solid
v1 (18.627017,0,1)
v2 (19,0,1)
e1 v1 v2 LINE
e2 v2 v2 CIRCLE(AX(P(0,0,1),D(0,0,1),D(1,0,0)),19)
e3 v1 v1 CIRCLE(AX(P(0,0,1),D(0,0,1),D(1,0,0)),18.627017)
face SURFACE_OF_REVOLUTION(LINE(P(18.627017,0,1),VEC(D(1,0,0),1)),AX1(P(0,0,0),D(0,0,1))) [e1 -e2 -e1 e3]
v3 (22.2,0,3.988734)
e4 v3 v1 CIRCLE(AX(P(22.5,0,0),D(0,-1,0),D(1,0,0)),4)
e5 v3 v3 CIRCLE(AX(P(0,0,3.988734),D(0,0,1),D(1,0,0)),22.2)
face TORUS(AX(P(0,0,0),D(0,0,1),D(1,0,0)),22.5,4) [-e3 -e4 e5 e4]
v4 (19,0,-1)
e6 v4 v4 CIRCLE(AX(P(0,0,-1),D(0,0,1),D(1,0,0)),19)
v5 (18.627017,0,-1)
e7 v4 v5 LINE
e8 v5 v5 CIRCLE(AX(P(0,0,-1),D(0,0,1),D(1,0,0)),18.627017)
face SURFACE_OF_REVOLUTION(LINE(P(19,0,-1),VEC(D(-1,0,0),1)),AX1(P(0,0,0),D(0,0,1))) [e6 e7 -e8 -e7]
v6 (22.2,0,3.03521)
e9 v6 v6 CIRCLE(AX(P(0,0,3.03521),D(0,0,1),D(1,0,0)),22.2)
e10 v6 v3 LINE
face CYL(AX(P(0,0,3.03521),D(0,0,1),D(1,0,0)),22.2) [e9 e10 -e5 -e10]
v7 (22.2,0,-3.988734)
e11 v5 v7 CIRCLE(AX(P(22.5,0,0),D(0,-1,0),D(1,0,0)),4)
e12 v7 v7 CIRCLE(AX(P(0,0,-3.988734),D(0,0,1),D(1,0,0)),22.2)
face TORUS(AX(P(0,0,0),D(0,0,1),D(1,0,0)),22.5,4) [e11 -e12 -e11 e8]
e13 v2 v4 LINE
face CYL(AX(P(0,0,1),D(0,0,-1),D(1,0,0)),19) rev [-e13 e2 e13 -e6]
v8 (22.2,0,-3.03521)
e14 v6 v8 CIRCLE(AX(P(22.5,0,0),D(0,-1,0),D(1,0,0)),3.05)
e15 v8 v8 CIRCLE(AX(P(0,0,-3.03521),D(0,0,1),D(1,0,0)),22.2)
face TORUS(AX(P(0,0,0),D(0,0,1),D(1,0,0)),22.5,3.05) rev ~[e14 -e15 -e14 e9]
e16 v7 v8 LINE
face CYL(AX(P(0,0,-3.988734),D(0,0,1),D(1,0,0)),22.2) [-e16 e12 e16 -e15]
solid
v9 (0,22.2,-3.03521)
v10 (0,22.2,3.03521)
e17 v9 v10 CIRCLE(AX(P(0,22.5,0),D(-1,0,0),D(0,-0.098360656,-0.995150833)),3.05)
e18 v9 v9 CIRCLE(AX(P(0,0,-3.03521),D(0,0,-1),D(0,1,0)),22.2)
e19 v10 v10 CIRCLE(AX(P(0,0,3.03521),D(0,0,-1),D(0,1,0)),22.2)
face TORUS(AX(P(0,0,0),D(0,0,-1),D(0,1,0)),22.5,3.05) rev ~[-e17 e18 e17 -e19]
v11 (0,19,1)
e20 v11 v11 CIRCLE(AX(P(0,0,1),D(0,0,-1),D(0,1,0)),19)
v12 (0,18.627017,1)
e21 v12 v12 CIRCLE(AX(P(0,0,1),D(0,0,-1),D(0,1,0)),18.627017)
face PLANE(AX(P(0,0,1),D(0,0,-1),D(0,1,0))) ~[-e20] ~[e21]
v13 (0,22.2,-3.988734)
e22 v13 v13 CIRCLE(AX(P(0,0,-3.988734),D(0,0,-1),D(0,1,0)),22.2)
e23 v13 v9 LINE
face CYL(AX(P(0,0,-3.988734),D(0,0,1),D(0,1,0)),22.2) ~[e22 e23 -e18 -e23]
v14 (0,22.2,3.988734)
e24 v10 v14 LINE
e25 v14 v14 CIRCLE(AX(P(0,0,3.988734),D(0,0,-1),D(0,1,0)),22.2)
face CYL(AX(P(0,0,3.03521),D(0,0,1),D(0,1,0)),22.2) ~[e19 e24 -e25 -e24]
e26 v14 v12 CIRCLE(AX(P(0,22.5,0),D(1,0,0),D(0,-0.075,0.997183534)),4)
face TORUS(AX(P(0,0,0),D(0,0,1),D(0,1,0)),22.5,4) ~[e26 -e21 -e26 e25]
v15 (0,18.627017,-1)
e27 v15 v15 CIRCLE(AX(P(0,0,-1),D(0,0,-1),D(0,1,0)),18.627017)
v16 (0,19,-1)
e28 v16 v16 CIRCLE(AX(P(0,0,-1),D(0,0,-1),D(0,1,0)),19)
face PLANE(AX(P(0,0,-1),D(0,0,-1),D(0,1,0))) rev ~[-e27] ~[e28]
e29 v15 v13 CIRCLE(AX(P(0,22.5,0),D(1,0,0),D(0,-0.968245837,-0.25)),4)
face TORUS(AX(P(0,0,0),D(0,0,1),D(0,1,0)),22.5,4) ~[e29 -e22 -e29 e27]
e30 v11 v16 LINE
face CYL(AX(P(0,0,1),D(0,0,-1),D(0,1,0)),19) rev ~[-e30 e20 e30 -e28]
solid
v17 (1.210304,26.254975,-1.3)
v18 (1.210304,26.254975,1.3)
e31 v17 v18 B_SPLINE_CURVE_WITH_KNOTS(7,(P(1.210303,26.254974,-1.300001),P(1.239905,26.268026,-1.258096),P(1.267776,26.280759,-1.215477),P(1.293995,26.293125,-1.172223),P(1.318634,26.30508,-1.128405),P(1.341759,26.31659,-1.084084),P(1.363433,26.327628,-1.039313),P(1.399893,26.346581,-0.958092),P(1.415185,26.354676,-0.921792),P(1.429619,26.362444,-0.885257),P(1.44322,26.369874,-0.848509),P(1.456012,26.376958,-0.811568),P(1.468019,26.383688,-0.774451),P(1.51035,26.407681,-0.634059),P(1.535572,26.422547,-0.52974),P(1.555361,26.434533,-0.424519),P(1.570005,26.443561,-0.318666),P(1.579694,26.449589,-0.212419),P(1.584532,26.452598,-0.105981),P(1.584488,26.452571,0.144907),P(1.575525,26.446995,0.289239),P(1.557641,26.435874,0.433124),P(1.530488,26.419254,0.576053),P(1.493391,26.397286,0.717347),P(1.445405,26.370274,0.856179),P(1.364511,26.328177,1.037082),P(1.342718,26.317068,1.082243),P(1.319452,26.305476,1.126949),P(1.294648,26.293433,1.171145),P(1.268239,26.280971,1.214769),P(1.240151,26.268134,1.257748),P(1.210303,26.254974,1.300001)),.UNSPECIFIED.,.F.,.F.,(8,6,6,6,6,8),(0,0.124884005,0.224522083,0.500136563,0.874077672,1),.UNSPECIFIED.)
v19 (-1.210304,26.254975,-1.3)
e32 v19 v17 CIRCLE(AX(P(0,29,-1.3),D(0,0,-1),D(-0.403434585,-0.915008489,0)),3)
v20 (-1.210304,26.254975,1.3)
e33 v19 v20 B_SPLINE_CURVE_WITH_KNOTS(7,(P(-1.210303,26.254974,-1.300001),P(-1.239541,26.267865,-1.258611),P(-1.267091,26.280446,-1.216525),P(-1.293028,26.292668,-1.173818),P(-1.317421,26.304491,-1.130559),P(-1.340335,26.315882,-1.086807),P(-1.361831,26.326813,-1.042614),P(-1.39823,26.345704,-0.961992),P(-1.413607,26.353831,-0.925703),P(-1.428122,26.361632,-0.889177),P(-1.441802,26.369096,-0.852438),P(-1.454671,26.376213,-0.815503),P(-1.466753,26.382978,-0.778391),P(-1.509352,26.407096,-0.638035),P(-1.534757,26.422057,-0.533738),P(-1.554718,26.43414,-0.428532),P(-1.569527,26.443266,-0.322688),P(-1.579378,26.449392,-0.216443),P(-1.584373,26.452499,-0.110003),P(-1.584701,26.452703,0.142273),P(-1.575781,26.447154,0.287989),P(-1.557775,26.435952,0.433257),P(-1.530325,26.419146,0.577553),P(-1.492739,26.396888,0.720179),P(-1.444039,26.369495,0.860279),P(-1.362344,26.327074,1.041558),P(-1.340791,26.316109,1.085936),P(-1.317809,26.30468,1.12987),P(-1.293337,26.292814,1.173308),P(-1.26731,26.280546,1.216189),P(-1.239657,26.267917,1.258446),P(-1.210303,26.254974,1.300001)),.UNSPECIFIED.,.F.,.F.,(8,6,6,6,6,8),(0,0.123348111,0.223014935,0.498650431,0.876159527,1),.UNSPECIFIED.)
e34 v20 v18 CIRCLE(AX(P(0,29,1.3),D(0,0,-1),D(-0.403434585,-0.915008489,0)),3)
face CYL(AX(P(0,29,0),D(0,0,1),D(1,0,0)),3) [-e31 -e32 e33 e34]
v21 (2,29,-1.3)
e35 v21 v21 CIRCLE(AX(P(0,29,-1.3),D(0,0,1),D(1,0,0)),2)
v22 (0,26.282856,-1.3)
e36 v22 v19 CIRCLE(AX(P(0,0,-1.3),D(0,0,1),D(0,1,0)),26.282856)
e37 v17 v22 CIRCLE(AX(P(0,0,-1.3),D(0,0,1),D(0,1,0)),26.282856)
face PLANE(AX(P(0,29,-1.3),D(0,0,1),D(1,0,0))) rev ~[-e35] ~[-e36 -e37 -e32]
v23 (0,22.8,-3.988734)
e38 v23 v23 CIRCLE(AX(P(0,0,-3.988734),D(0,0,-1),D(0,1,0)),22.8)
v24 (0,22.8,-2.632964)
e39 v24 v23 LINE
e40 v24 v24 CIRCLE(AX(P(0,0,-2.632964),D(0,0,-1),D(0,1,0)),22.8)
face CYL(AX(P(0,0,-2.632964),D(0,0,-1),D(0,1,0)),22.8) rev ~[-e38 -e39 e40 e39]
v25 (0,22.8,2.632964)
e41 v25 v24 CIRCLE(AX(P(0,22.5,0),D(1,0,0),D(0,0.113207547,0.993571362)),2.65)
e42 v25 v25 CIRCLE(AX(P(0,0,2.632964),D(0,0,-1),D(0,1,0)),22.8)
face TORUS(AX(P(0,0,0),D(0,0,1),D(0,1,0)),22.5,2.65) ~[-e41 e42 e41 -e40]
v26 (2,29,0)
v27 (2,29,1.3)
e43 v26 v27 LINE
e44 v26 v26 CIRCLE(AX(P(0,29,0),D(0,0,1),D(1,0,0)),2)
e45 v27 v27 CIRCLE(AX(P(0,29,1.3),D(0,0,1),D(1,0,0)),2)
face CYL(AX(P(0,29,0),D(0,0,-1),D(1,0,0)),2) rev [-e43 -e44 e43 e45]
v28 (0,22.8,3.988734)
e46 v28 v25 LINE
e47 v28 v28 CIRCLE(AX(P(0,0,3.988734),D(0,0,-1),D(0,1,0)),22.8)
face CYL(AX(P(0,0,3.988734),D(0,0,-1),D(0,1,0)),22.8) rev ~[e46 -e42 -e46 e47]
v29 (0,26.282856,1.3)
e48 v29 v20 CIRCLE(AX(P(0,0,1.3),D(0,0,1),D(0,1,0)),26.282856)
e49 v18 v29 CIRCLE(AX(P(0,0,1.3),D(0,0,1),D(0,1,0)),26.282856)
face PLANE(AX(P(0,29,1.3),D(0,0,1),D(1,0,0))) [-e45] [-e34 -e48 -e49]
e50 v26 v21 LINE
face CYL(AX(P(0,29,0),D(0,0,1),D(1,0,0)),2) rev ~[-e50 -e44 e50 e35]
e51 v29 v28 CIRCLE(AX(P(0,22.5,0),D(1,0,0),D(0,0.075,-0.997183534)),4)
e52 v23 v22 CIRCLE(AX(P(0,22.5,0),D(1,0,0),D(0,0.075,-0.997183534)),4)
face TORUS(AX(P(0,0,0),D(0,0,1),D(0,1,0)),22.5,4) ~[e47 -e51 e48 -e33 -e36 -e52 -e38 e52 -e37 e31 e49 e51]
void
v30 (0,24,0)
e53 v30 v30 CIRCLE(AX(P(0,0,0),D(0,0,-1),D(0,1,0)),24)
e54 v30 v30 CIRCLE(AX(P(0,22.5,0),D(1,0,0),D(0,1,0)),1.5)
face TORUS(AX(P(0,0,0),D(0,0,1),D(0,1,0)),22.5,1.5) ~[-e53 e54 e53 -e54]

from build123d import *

# Parameters (mm, degrees)
F3_R          = 3
F3_R_2        = 2
F4_DEPTH      = 1.3
F4_DEPTH_BACK = 1.3
F1_R          = 1.5


with BuildPart() as f2:
    # F2: sweep along a path in F0
    with BuildLine(Plane.XY) as f2_path:
        CenterArc((0, 0), 22.5, 0, 360)
    # F1 (on Right) → F2 (sweep)
    with BuildSketch(Plane.YZ):
        with BuildLine():
            Line((22.2, 3.0352100422), (22.2, 3.988734135))
            ThreePointArc((22.2, 3.988734135), (19.9335665926, 3.0681296527), (18.6270166538, 1))
            Line((18.6270166538, 1), (19, 1))
            Line((19, 1), (19, -1))
            Line((19, -1), (18.6270166538, -1))
            ThreePointArc((18.6270166538, -1), (19.9335665926, -3.0681296527), (22.2, -3.988734135))
            Line((22.2, -3.988734135), (22.2, -3.0352100422))
            ThreePointArc((22.2, -3.0352100422), (19.45, 0), (22.2, 3.0352100422))
        make_face()
    sweep(path=f2_path.line)


with BuildPart() as f4:
    # F3 (on Top) → F4 (new body, two sides)
    with BuildSketch(Plane.XY) as f4_sk:
        with Locations((0, 29)):
            Circle(F3_R)
        with Locations((0, 29)):
            Circle(F3_R_2, mode=Mode.SUBTRACT)
    extrude(amount=F4_DEPTH)
    extrude(f4_sk.sketch, amount=-F4_DEPTH_BACK)

    # F1 (on Right) → F6, piece 2 (revolve)
    with BuildSketch(Plane.YZ):
        with BuildLine():
            Line((22.8, 3.988734135), (22.8, 2.6329641091))
            ThreePointArc((22.8, 2.6329641091), (19.85, 0), (22.8, -2.6329641091))
            Line((22.8, -2.6329641091), (22.8, -3.988734135))
            ThreePointArc((22.8, -3.988734135), (26.5, 0), (22.8, 3.988734135))
        make_face()
        with Locations((22.5, 0)):
            Circle(F1_R, mode=Mode.SUBTRACT)
    revolve(axis=Axis((0, 0, -12.8101566806), (0, 0, -1)))


with BuildPart() as f6:
    # F1 (on Right) → F6 (revolve)
    with BuildSketch(Plane.YZ):
        with BuildLine():
            Line((22.2, 3.0352100422), (22.2, 3.988734135))
            ThreePointArc((22.2, 3.988734135), (19.9335665926, 3.0681296527), (18.6270166538, 1))
            Line((18.6270166538, 1), (19, 1))
            Line((19, 1), (19, -1))
            Line((19, -1), (18.6270166538, -1))
            ThreePointArc((18.6270166538, -1), (19.9335665926, -3.0681296527), (22.2, -3.988734135))
            Line((22.2, -3.988734135), (22.2, -3.0352100422))
            ThreePointArc((22.2, -3.0352100422), (19.45, 0), (22.2, 3.0352100422))
        make_face()
    revolve(axis=Axis((0, 0, -12.8101566806), (0, 0, -1)))


solid = Compound([f2.part, f4.part, f6.part])
